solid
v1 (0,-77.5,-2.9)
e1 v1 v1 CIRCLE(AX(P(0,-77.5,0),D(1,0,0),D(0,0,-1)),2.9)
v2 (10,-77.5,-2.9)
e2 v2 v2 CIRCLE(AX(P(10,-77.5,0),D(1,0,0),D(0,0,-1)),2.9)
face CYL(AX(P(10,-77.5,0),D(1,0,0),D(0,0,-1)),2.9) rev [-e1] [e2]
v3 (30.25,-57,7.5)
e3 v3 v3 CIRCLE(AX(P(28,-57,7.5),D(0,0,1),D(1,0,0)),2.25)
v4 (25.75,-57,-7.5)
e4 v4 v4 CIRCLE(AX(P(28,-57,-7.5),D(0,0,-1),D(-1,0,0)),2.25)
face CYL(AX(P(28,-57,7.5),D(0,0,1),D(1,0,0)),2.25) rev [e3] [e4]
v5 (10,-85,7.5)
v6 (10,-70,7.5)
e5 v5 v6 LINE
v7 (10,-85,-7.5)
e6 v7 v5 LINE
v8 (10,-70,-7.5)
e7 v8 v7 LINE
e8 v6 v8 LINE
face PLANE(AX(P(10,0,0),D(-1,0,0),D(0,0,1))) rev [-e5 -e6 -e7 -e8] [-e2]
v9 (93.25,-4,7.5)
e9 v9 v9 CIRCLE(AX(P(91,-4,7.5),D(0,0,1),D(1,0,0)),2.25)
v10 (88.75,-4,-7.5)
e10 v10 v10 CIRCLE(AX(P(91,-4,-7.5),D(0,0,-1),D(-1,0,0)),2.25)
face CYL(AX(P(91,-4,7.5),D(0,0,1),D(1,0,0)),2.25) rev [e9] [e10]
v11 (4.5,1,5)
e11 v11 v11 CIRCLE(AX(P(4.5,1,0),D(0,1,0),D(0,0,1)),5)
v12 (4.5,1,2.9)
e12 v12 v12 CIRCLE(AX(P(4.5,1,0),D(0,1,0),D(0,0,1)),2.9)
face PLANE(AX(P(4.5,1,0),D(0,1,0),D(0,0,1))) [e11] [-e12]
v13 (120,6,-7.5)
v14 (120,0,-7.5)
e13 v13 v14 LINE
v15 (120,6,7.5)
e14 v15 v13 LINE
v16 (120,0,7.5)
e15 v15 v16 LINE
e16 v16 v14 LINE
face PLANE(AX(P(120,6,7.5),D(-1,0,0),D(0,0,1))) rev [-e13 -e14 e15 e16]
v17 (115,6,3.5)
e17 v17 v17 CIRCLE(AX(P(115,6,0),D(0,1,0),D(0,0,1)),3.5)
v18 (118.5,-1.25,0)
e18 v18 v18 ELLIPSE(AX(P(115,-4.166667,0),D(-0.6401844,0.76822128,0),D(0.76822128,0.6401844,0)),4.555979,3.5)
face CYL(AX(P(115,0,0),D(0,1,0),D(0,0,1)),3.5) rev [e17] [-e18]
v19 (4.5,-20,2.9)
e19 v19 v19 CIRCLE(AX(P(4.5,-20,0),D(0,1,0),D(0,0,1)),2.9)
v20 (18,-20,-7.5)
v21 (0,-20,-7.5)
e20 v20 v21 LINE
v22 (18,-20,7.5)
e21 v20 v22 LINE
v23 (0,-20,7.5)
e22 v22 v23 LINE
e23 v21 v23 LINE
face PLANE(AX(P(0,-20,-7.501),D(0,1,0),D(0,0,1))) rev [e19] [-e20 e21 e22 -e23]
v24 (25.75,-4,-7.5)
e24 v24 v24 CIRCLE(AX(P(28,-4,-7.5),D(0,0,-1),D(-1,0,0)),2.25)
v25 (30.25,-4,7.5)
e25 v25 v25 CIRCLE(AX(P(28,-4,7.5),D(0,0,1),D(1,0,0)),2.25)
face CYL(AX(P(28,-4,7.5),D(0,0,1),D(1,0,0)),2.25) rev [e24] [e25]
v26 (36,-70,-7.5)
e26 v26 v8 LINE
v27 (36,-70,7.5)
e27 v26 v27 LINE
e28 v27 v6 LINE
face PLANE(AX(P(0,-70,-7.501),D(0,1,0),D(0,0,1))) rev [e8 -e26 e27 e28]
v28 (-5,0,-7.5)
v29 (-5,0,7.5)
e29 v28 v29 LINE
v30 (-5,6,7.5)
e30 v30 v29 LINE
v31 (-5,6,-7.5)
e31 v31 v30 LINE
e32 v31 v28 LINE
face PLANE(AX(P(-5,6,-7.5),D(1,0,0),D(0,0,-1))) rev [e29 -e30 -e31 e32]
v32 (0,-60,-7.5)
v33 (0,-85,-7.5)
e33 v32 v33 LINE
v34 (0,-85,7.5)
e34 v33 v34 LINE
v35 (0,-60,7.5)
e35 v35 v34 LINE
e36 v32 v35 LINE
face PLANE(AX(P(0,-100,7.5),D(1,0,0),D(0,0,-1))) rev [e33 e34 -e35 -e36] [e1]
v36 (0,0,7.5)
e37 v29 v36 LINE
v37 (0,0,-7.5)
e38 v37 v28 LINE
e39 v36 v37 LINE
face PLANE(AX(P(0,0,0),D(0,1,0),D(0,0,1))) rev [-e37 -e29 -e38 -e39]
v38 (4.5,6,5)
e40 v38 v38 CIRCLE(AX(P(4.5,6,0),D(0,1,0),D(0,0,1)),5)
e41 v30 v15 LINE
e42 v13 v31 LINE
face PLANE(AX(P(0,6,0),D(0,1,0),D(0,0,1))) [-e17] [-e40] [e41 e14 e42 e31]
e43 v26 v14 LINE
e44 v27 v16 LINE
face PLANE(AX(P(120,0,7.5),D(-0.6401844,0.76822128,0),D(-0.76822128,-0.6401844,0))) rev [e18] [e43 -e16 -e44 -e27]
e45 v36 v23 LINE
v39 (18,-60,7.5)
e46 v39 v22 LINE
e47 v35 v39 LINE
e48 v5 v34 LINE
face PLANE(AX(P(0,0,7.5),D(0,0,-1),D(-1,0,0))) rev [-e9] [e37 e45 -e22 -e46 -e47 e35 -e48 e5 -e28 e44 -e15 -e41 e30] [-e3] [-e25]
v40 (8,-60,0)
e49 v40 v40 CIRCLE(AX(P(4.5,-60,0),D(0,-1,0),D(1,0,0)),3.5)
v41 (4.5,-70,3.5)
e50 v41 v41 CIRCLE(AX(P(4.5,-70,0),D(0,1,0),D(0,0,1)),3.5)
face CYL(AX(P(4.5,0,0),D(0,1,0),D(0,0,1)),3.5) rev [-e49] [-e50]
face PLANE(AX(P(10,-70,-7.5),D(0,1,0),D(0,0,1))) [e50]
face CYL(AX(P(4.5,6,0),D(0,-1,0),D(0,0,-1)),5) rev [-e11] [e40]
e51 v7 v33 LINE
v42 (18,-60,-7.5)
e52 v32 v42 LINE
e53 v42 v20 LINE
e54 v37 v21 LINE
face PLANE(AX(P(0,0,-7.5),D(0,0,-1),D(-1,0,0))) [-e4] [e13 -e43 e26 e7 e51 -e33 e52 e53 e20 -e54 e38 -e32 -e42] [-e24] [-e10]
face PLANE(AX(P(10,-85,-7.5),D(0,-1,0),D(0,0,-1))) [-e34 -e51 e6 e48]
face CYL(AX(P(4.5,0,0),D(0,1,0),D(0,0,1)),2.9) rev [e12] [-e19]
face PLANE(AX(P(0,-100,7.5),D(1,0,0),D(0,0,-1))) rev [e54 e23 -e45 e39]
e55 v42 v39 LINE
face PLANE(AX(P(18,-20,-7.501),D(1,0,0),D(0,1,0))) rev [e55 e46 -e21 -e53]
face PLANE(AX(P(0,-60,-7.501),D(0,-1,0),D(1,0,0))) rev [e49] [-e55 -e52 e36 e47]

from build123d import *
from build123d.topology import SkipClean

# Parameters (mm, degrees)
BOSS_EXTRUDE1_DEPTH                = 7.5
CUT_EXTRUDE1_REACH                 = 158.924
SKETCH2_W                          = 18
SKETCH2_H                          = 40
M5_CLEARANCE_HOLE1_D               = 5.8
CUT_EXTRUDE2_REACH                 = 158.924
F_7_0_7_DIAMETER_HOLE1_D           = 7
F_7_0_7_DIAMETER_HOLE1_DEPTH       = 20
MOVE_FACE1_BY                      = 0.6
SKETCH15_W                         = 15
SKETCH15_H                         = 15
BOSS_EXTRUDE3_DEPTH                = 10
M5_CLEARANCE_HOLE2_D               = 5.8
SKETCH19_W                         = 125
SKETCH19_H                         = 15
SKETCH19_R                         = 3.5
SKETCH19_R_2                       = 5
BOSS_EXTRUDE4_DEPTH                = 6
SKETCH23_R                         = 5
SKETCH23_R_2                       = 2.9
BOSS_EXTRUDE5_DEPTH                = 1
F_4_5_START                        = -7.5
F_4_5_4_5_DIAMETER_HOLE1_OUTLINE_R = 2.25
F_4_5_4_5_DIAMETER_HOLE1_DEPTH     = 15


# Read off the part's stored shape, not the designer's step: Ø4.5 (4.5) Diameter Hole1
with BuildPart() as part:
    # Sketch1 → Boss-Extrude1 (new, symmetric)
    with BuildSketch(Plane.XY):
        Polygon((0, 0), (120, 0), (0, -100), align=None)
    extrude(amount=BOSS_EXTRUDE1_DEPTH, both=True)

    # Sketch2 → Cut-Extrude1 (cut, up to next)
    with BuildSketch(Plane.XY.offset(7.5), mode=Mode.PRIVATE) as cut_extrude1_sk1:
        with Locations((9, -40)):
            Rectangle(SKETCH2_W, SKETCH2_H)
    cut_extrude1_tool1 = extrude(cut_extrude1_sk1.sketch, amount=-CUT_EXTRUDE1_REACH, mode=Mode.PRIVATE) & part.part
    add(cut_extrude1_tool1.solids().sort_by_distance((9, -40, 7.5))[0], mode=Mode.SUBTRACT)

    # M5 Clearance Hole1 (through all)
    with Locations(Plane(origin=(0, 0, 0), x_dir=(1, 0, 0), z_dir=(0, 1, 0))):
        with Locations((4.5, 0)):
            Hole(M5_CLEARANCE_HOLE1_D / 2)

    # Sketch8 → Cut-Extrude2 (cut, up to next)
    with BuildSketch(Plane.XY.offset(7.5), mode=Mode.PRIVATE) as cut_extrude2_sk1:
        Polygon((0, -70), (36, -70), (0, -100), align=None)
    cut_extrude2_tool1 = extrude(cut_extrude2_sk1.sketch, amount=-CUT_EXTRUDE2_REACH, mode=Mode.PRIVATE) & part.part
    add(cut_extrude2_tool1.solids().sort_by_distance((12, -80, 7.5))[0], mode=Mode.SUBTRACT)

    # Ø7.0 (7) Diameter Hole1
    with Locations(Plane(origin=(0, 0, 0), x_dir=(1, 0, 0), z_dir=(0, 1, 0))):
        with Locations((115, 0)):
            Hole(F_7_0_7_DIAMETER_HOLE1_D / 2, depth=F_7_0_7_DIAMETER_HOLE1_DEPTH)

    # Move Face1: a curved face moved inward by 0.6
    add(Solid.thicken(part.faces().sort_by_distance((7.4, -65, 0))[0], -MOVE_FACE1_BY), mode=Mode.SUBTRACT)

    # Sketch15 → Boss-Extrude3 (add)
    with BuildSketch(Plane.ZY):
        with Locations((0, -77.5)):
            Rectangle(SKETCH15_W, SKETCH15_H)
    extrude(amount=-BOSS_EXTRUDE3_DEPTH)

    # M5 Clearance Hole2 (through all)
    with Locations(Plane(origin=(10, 0, 0), x_dir=(0, 0, -1), z_dir=(1, 0, 0))):
        with Locations((0, -77.5)):
            Hole(M5_CLEARANCE_HOLE2_D / 2)

    # Sketch19 → Boss-Extrude4 (add)
    with SkipClean():  # the faces are left unmerged after this step: merging them gives an invalid solid
        with BuildSketch(Plane(origin=(0, 0, 0), x_dir=(1, 0, 0), z_dir=(0, 1, 0))):
            with Locations((57.5, 0)):
                Rectangle(SKETCH19_W, SKETCH19_H)
            with Locations(Location((115, 0, 0), (0, 0, 270))):
                Circle(SKETCH19_R, mode=Mode.SUBTRACT)
            with Locations(Location((4.5, 0, 0), (0, 0, 154.158067237))):
                Circle(SKETCH19_R_2, mode=Mode.SUBTRACT)
        extrude(amount=BOSS_EXTRUDE4_DEPTH)

    # Sketch23 → Boss-Extrude5 (add)
    with BuildSketch(Plane(origin=(0, 0, 0), x_dir=(1, 0, 0), z_dir=(0, 1, 0))):
        with Locations(Location((4.5, 0, 0), (0, 0, 270))):
            Circle(SKETCH23_R)
        with Locations(Location((4.5, 0, 0), (0, 0, 270))):
            Circle(SKETCH23_R_2, mode=Mode.SUBTRACT)
    extrude(amount=BOSS_EXTRUDE5_DEPTH)

    # Ø4.5 (4.5) Diameter Hole1 outline → Ø4.5 (4.5) Diameter Hole1 (cut)
    with BuildSketch(Plane.XY.offset(F_4_5_START)):
        with Locations((91, -4)):
            Circle(F_4_5_4_5_DIAMETER_HOLE1_OUTLINE_R)
        with Locations((28, -57)):
            Circle(F_4_5_4_5_DIAMETER_HOLE1_OUTLINE_R)
        with Locations((28, -4)):
            Circle(F_4_5_4_5_DIAMETER_HOLE1_OUTLINE_R)
    extrude(amount=F_4_5_4_5_DIAMETER_HOLE1_DEPTH, mode=Mode.SUBTRACT)


solid = part.part
